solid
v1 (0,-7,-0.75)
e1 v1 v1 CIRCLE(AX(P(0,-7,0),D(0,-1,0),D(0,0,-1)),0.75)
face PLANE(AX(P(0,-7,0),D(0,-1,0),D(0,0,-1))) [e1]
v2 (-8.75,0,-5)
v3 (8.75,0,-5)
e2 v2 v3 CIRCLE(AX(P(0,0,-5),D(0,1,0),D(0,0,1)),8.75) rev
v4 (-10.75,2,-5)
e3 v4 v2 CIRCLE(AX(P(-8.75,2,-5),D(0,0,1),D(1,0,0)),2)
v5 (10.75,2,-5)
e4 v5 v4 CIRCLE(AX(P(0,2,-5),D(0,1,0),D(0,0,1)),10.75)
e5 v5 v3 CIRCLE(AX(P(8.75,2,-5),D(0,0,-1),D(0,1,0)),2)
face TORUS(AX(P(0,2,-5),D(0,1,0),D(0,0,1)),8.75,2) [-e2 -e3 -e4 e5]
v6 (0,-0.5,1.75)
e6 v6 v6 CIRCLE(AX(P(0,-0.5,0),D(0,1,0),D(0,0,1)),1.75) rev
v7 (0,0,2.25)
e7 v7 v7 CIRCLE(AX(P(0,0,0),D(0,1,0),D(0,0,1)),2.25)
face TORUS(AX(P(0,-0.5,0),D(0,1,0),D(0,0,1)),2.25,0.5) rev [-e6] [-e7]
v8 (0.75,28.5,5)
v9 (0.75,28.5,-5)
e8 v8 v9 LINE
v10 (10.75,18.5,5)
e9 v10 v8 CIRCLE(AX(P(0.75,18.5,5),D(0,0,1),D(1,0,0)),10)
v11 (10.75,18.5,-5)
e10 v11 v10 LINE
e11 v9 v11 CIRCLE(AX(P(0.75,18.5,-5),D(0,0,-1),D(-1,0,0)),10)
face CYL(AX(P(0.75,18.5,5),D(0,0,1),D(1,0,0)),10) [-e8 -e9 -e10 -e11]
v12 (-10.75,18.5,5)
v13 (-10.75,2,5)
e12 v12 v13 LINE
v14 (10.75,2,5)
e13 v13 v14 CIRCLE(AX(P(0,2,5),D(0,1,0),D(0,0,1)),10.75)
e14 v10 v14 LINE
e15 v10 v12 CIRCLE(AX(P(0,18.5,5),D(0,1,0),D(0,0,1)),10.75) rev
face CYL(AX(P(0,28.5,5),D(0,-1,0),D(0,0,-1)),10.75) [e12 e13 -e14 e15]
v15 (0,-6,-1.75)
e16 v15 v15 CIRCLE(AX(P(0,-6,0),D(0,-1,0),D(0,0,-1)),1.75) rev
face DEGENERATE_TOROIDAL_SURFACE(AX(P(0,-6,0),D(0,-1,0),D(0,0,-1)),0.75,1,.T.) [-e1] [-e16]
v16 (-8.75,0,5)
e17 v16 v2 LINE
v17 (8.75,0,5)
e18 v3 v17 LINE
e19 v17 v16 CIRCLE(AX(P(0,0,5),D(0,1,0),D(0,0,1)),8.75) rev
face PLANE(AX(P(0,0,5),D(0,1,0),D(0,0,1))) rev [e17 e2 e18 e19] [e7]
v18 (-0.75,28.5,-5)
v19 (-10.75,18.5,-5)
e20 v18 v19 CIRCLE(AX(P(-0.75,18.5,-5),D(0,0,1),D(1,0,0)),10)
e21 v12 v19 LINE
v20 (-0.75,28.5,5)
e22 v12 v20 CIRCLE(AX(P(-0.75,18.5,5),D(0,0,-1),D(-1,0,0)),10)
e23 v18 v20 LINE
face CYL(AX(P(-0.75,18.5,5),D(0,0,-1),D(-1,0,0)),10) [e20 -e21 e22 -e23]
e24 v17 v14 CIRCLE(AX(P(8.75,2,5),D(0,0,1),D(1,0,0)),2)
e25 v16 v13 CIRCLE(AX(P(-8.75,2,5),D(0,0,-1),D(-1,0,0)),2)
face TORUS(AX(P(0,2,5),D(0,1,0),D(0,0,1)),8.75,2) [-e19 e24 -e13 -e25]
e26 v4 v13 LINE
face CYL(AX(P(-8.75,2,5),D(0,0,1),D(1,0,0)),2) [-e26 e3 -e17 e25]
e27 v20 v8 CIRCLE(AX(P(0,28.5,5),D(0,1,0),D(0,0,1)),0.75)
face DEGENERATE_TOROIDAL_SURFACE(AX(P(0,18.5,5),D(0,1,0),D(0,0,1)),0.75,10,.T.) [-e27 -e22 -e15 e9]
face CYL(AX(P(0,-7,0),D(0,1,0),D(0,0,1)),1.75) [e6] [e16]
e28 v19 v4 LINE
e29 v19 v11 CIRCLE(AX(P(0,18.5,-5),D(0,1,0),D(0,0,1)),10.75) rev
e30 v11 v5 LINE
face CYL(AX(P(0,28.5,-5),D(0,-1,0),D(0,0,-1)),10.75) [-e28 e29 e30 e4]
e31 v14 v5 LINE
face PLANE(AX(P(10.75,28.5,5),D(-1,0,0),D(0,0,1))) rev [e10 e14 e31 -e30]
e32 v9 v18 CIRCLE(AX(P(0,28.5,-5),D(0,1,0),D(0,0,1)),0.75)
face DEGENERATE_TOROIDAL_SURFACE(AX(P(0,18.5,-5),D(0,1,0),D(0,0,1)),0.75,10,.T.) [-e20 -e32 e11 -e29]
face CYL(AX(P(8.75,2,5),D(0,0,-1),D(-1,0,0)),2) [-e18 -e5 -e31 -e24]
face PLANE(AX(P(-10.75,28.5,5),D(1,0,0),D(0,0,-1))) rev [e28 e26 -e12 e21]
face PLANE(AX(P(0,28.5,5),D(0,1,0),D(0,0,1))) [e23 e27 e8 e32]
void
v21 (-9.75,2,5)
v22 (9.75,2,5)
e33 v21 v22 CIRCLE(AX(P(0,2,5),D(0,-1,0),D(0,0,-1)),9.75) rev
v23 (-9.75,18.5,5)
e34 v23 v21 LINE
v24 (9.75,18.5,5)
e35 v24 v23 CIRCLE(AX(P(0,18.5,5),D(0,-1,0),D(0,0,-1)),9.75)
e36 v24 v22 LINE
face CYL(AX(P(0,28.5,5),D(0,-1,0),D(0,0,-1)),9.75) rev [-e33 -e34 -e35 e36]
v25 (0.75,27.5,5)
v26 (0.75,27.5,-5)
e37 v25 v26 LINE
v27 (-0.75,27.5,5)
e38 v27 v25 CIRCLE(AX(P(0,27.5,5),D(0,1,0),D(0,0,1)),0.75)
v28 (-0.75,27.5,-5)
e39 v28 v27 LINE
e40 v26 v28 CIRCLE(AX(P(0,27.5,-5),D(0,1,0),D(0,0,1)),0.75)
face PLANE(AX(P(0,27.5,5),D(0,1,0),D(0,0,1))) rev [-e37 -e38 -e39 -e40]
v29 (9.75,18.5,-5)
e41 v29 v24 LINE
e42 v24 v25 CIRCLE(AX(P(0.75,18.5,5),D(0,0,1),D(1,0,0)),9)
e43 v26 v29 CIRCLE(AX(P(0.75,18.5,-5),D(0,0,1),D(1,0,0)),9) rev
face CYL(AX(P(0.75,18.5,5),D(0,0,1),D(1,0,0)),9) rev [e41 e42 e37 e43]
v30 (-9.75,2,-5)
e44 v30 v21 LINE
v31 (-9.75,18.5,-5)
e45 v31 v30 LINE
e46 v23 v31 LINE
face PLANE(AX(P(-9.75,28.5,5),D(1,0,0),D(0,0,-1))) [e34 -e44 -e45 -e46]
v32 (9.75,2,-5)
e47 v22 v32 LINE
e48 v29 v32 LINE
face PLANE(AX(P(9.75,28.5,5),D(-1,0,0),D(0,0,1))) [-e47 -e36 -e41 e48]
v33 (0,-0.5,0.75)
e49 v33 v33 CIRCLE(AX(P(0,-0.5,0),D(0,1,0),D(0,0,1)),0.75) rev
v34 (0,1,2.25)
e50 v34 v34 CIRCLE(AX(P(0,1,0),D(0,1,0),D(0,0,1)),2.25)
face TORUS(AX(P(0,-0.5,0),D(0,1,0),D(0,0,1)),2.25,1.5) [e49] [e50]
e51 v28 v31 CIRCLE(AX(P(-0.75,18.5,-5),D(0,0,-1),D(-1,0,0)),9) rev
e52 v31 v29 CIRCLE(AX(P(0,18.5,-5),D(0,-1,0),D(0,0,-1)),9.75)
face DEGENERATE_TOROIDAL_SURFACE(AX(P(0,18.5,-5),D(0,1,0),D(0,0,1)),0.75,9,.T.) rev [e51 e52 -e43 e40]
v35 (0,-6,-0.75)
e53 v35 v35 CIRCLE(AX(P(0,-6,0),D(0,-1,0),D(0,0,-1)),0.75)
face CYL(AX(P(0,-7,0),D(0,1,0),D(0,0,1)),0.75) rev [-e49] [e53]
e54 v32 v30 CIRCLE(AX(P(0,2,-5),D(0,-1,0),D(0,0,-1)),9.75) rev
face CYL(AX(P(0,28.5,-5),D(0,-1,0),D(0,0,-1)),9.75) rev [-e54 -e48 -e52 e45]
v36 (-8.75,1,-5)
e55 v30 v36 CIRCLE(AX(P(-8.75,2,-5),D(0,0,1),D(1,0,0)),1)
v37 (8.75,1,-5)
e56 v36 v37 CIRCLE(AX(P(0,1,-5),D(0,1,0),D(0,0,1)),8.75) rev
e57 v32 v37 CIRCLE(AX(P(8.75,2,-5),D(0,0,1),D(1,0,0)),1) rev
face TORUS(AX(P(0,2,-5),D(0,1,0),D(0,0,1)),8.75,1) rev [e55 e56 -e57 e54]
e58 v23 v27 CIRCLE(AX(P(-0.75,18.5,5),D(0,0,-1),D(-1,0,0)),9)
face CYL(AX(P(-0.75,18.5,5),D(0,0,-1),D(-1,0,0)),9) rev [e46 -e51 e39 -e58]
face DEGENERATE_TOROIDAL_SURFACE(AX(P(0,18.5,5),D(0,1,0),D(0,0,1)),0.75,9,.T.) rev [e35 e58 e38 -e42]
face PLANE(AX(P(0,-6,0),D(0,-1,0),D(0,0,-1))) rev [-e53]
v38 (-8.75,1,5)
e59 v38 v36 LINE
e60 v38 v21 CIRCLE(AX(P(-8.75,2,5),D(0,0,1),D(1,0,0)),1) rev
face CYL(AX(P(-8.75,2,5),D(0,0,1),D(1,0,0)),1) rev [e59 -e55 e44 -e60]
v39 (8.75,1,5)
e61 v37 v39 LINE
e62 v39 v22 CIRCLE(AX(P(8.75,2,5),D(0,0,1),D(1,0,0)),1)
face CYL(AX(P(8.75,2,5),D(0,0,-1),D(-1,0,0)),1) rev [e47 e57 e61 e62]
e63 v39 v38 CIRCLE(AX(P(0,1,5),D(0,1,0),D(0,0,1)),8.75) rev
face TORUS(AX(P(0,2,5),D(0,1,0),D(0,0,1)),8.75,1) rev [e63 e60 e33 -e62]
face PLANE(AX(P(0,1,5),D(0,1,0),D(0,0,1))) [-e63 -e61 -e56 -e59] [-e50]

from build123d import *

# Parameters (mm, degrees)
BOSS_EXTRUDE1_DEPTH = 28.5
FILLET2_R           = 10
FILLET3_R           = 2
SKETCH2_R           = 1.75
BOSS_EXTRUDE2_DEPTH = 7
FILLET4_R           = 1
FILLET5_R           = 0.5
SHELL2_T            = 1


with BuildPart() as part:
    # Sketch1 → Boss-Extrude1 (new body)
    with BuildSketch(Plane(origin=(0, 0, 0), x_dir=(1, 0, 0), z_dir=(0, 1, 0))):
        with BuildLine():
            Line((-10.75, -5), (-10.75, 5))
            ThreePointArc((-10.75, 5), (0, 15.75), (10.75, 5))
            Line((10.75, 5), (10.75, -5))
            ThreePointArc((10.75, -5), (0, -15.75), (-10.75, -5))
        make_face()
    extrude(amount=BOSS_EXTRUDE1_DEPTH)

    # Fillet2
    fillet2_edges = [part.edges().sort_by_distance(p)[0] for p in [
        (0, 28.5, -15.75),
        (-10.75, 28.5, 0),
        (0, 28.5, 15.75),
        (10.75, 28.5, 0),
    ]]
    fillet(fillet2_edges, radius=FILLET2_R)

    # Fillet3
    fillet3_edges = [part.edges().sort_by_distance(p)[0] for p in [
        (-10.75, 0, 0),
        (0, 0, -15.75),
        (10.75, 0, 0),
        (0, 0, 15.75),
    ]]
    fillet(fillet3_edges, radius=FILLET3_R)

    # Sketch2 → Boss-Extrude2 (add)
    with BuildSketch(Plane.XZ):
        with Locations(Location((0, 0, 0), (0, 0, 90))):
            Circle(SKETCH2_R)
    extrude(amount=BOSS_EXTRUDE2_DEPTH)

    # Fillet4
    fillet4_edges = [part.edges().sort_by_distance(p)[0] for p in [
        (0, -7, -1.75),
    ]]
    fillet(fillet4_edges, radius=FILLET4_R)

    # Fillet5
    fillet5_edges = [part.edges().sort_by_distance(p)[0] for p in [
        (0, 0, -1.75),
    ]]
    fillet(fillet5_edges, radius=FILLET5_R)

    # Shell2 (no face opened: a closed hollow body)
    add(offset(amount=-SHELL2_T, mode=Mode.PRIVATE), mode=Mode.SUBTRACT)


solid = part.part
